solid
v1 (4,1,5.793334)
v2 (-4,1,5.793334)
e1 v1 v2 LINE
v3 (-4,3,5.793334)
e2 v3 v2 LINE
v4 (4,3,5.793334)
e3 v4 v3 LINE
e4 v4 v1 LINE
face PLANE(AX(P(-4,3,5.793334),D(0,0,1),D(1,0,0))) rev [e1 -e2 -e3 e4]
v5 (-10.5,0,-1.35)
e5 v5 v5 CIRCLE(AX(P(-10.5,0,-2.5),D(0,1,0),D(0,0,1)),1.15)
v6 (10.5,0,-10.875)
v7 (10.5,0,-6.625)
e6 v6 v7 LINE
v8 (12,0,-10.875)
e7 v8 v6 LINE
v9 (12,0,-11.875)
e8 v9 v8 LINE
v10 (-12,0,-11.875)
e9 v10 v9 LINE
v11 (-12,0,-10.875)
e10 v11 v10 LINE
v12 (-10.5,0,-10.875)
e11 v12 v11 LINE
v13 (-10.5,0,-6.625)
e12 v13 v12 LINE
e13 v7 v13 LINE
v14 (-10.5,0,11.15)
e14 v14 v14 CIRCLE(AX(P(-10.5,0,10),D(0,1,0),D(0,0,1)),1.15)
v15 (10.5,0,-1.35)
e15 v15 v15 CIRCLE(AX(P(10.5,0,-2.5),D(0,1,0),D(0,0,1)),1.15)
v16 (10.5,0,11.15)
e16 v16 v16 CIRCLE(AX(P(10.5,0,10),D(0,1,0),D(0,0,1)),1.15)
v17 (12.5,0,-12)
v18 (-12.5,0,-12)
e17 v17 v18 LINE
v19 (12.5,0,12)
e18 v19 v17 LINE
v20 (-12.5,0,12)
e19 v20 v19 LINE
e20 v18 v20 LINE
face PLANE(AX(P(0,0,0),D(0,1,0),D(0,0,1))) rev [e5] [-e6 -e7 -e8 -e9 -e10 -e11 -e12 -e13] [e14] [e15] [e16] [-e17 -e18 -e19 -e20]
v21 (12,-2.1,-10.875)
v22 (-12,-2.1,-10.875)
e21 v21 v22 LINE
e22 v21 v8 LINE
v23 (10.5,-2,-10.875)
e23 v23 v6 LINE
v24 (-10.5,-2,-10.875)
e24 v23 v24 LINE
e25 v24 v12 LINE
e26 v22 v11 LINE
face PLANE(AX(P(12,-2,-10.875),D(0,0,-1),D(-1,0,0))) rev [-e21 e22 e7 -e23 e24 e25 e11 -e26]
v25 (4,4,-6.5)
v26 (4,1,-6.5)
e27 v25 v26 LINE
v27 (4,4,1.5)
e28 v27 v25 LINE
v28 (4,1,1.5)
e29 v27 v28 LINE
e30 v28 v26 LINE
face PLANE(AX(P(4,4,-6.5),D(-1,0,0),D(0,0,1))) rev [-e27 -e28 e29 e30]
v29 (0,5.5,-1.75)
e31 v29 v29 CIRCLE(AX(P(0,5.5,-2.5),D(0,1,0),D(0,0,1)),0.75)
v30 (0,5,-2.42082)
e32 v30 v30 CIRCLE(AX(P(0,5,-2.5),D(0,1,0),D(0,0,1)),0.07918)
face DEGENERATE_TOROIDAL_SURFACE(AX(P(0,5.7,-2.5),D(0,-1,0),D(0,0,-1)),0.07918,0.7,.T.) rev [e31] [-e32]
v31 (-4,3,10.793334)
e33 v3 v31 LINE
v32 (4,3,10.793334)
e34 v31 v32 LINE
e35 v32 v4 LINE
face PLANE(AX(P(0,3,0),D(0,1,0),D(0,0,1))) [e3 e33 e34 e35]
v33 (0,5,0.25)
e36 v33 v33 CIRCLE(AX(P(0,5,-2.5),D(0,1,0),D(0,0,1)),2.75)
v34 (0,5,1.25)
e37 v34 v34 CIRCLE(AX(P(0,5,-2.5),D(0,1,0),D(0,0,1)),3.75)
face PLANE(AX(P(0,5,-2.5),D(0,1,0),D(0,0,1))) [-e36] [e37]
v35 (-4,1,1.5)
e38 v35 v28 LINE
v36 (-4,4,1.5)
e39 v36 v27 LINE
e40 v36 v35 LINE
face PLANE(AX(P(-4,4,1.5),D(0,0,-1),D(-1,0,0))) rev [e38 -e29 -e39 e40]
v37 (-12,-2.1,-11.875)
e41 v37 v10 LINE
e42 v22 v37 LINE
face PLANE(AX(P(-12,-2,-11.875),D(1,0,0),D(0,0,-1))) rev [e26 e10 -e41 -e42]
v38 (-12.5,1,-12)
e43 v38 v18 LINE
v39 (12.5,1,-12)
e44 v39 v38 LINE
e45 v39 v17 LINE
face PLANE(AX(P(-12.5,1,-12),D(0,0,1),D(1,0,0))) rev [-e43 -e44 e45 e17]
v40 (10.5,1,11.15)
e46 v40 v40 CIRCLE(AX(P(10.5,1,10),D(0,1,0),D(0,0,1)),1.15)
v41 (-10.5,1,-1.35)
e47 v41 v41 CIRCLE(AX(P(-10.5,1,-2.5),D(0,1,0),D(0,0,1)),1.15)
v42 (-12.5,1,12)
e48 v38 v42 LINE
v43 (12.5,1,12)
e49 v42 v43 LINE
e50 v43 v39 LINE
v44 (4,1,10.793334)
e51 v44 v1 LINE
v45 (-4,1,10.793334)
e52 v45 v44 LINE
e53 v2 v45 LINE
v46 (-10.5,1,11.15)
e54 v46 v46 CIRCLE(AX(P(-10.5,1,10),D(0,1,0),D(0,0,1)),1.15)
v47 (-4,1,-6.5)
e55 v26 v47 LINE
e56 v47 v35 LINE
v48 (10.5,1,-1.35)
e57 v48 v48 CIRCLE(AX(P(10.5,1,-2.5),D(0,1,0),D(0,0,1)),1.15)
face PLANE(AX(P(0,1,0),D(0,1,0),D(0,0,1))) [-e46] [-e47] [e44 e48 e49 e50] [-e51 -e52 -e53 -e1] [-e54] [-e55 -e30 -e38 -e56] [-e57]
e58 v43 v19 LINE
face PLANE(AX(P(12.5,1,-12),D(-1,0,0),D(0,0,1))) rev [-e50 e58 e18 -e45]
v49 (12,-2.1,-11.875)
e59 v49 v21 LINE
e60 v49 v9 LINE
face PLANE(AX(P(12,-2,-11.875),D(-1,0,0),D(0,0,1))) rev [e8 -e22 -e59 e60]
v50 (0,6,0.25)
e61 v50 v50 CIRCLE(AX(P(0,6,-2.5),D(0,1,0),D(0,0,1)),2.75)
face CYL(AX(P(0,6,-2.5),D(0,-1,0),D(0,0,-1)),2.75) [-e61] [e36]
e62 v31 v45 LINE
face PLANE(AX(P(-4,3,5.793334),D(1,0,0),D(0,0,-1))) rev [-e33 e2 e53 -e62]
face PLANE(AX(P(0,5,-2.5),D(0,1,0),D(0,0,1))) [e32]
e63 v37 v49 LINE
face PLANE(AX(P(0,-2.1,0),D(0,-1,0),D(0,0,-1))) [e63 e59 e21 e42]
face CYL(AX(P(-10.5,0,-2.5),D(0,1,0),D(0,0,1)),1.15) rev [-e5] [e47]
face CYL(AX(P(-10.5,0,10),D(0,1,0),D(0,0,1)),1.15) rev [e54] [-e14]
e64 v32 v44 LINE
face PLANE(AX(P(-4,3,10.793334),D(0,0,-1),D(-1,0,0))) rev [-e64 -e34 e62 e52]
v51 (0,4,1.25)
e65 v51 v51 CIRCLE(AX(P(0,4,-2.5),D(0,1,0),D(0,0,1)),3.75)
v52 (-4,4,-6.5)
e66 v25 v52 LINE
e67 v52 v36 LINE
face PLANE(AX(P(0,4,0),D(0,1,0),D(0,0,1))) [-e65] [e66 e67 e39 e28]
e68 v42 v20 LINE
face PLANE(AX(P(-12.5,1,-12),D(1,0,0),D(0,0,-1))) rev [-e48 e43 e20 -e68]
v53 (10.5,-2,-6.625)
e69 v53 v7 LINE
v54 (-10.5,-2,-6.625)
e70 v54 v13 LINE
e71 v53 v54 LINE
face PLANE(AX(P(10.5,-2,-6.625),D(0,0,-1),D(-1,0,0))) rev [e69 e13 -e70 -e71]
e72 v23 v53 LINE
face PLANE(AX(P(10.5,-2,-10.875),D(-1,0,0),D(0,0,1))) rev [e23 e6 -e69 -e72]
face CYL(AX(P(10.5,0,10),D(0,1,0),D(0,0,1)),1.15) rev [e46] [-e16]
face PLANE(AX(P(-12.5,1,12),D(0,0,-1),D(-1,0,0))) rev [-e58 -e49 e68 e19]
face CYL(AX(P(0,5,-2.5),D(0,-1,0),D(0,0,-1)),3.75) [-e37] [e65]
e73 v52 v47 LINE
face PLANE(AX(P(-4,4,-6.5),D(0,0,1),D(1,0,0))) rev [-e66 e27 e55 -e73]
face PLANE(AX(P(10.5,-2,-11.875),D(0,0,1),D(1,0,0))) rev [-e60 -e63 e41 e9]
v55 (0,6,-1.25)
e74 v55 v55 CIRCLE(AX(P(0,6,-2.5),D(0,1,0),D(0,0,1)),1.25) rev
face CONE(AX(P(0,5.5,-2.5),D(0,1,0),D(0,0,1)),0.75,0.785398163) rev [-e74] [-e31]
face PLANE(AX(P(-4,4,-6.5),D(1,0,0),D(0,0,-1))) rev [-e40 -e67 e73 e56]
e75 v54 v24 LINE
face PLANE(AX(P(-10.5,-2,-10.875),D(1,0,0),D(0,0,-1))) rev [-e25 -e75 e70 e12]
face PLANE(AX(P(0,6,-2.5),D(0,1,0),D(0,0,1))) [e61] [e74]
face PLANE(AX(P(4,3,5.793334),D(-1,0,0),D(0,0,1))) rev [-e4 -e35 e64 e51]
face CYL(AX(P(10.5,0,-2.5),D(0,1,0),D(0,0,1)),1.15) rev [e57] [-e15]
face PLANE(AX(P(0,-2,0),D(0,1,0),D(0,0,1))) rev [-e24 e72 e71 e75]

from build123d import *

# Parameters (mm, degrees)
SKETCH1_W           = 25
SKETCH1_H           = 24
BOSS_EXTRUDE1_DEPTH = 1
SKETCH2_R           = 1.15
CUT_EXTRUDE1_DEPTH  = 1
SKETCH3_W           = 8
SKETCH3_H           = 5
BOSS_EXTRUDE2_DEPTH = 2
SKETCH4_W           = 8
SKETCH4_H           = 8
BOSS_EXTRUDE3_DEPTH = 3
SKETCH5_R           = 3.75
BOSS_EXTRUDE4_DEPTH = 1
SKETCH6_R           = 2.75
BOSS_EXTRUDE5_DEPTH = 1
SKETCH7_R           = 0.75
CUT_EXTRUDE3_DEPTH  = 1
CHAMFER1_SIZE       = 0.5
FILLET2_R           = 0.7
BOSS_EXTRUDE6_DEPTH = 2
SKETCH9_W           = 24
SKETCH9_H           = 1
BOSS_EXTRUDE7_DEPTH = 0.1


with BuildPart() as part:
    # Sketch1 → Boss-Extrude1 (new body)
    with BuildSketch(Plane(origin=(0, 0, 0), x_dir=(1, 0, 0), z_dir=(0, 1, 0))):
        Rectangle(SKETCH1_W, SKETCH1_H)
    extrude(amount=BOSS_EXTRUDE1_DEPTH)

    # Sketch2 → Cut-Extrude1 (cut)
    with BuildSketch(Plane(origin=(0, 1, 0), x_dir=(1, 0, 0), z_dir=(0, 1, 0))):
        with Locations(Location((10.5, -10, 0), (0, 0, 270))):
            Circle(SKETCH2_R)
        with Locations(Location((-10.5, -10, 0), (0, 0, 270))):
            Circle(SKETCH2_R)
        with Locations(Location((-10.5, 2.5, 0), (0, 0, 270))):
            Circle(SKETCH2_R)
        with Locations(Location((10.5, 2.5, 0), (0, 0, 270))):
            Circle(SKETCH2_R)
    extrude(amount=-CUT_EXTRUDE1_DEPTH, mode=Mode.SUBTRACT)

    # Sketch3 → Boss-Extrude2 (add)
    with BuildSketch(Plane(origin=(0, 1, 0), x_dir=(1, 0, 0), z_dir=(0, 1, 0))):
        with Locations((0, -8.293334271)):
            Rectangle(SKETCH3_W, SKETCH3_H)
    extrude(amount=BOSS_EXTRUDE2_DEPTH)

    # Sketch4 → Boss-Extrude3 (add)
    with BuildSketch(Plane(origin=(0, 1, 0), x_dir=(1, 0, 0), z_dir=(0, 1, 0))):
        with Locations((0, 2.5)):
            Rectangle(SKETCH4_W, SKETCH4_H)
    extrude(amount=BOSS_EXTRUDE3_DEPTH)

    # Sketch5 → Boss-Extrude4 (add)
    with BuildSketch(Plane(origin=(0, 4, 0), x_dir=(1, 0, 0), z_dir=(0, 1, 0))):
        with Locations(Location((0, 2.5, 0), (0, 0, 270))):
            Circle(SKETCH5_R)
    extrude(amount=BOSS_EXTRUDE4_DEPTH)

    # Sketch6 → Boss-Extrude5 (add)
    with BuildSketch(Plane(origin=(0, 5, 0), x_dir=(1, 0, 0), z_dir=(0, 1, 0))):
        with Locations(Location((0, 2.5, 0), (0, 0, 270))):
            Circle(SKETCH6_R)
    extrude(amount=BOSS_EXTRUDE5_DEPTH)

    # Sketch7 → Cut-Extrude3 (cut)
    with BuildSketch(Plane(origin=(0, 6, 0), x_dir=(1, 0, 0), z_dir=(0, 1, 0))):
        with Locations(Location((0, 2.5, 0), (0, 0, 270))):
            Circle(SKETCH7_R)
    extrude(amount=-CUT_EXTRUDE3_DEPTH, mode=Mode.SUBTRACT)

    # Chamfer1
    chamfer1_edges = [part.edges().sort_by_distance(p)[0] for p in [
        (0, 6, -3.25),
    ]]
    chamfer(chamfer1_edges, length=CHAMFER1_SIZE)

    # Fillet2
    # the kernel refuses this fillet: 0.7 mm, written as the material it adds along each edge
    with BuildSketch(Plane(origin=(0, 5, -2.5), x_dir=(0, 0, 1), z_dir=(-1, 0, 0))) as fillet2_piece_1:
        with BuildLine():
            CenterArc((0.079179607, 0.7), FILLET2_R, 270, 73.398450401)
            Line((0.079179607, 0), (0.079179607, -0.014))
            Line((0.079179607, -0.014), (0.75, -0.014))
            Line((0.75, -0.014), (0.764, 0))
            ThreePointArc((0.764, 0), (0.764, 0.25), (0.763416408, 0.496))
            Line((0.763416408, 0.496), (0.75, 0.5))
        make_face()
    revolve(axis=Axis((0, 5, -2.5), (0, 1, 0)))

    # Sketch8 → Boss-Extrude6 (add)
    with BuildSketch(Plane.XZ):
        Polygon((10.5, -11.875), (12, -11.875), (12, -10.875), (10.5, -10.875), (10.5, -6.625), (-10.5, -6.625), (-10.5, -10.875), (-12, -10.875), (-12, -11.875), (-10.5, -11.875), align=None)
    extrude(amount=BOSS_EXTRUDE6_DEPTH)

    # Sketch9 → Boss-Extrude7 (add)
    with BuildSketch(Plane.XZ.offset(2)):
        with Locations((0, -11.375)):
            Rectangle(SKETCH9_W, SKETCH9_H)
    extrude(amount=BOSS_EXTRUDE7_DEPTH)


solid = part.part
